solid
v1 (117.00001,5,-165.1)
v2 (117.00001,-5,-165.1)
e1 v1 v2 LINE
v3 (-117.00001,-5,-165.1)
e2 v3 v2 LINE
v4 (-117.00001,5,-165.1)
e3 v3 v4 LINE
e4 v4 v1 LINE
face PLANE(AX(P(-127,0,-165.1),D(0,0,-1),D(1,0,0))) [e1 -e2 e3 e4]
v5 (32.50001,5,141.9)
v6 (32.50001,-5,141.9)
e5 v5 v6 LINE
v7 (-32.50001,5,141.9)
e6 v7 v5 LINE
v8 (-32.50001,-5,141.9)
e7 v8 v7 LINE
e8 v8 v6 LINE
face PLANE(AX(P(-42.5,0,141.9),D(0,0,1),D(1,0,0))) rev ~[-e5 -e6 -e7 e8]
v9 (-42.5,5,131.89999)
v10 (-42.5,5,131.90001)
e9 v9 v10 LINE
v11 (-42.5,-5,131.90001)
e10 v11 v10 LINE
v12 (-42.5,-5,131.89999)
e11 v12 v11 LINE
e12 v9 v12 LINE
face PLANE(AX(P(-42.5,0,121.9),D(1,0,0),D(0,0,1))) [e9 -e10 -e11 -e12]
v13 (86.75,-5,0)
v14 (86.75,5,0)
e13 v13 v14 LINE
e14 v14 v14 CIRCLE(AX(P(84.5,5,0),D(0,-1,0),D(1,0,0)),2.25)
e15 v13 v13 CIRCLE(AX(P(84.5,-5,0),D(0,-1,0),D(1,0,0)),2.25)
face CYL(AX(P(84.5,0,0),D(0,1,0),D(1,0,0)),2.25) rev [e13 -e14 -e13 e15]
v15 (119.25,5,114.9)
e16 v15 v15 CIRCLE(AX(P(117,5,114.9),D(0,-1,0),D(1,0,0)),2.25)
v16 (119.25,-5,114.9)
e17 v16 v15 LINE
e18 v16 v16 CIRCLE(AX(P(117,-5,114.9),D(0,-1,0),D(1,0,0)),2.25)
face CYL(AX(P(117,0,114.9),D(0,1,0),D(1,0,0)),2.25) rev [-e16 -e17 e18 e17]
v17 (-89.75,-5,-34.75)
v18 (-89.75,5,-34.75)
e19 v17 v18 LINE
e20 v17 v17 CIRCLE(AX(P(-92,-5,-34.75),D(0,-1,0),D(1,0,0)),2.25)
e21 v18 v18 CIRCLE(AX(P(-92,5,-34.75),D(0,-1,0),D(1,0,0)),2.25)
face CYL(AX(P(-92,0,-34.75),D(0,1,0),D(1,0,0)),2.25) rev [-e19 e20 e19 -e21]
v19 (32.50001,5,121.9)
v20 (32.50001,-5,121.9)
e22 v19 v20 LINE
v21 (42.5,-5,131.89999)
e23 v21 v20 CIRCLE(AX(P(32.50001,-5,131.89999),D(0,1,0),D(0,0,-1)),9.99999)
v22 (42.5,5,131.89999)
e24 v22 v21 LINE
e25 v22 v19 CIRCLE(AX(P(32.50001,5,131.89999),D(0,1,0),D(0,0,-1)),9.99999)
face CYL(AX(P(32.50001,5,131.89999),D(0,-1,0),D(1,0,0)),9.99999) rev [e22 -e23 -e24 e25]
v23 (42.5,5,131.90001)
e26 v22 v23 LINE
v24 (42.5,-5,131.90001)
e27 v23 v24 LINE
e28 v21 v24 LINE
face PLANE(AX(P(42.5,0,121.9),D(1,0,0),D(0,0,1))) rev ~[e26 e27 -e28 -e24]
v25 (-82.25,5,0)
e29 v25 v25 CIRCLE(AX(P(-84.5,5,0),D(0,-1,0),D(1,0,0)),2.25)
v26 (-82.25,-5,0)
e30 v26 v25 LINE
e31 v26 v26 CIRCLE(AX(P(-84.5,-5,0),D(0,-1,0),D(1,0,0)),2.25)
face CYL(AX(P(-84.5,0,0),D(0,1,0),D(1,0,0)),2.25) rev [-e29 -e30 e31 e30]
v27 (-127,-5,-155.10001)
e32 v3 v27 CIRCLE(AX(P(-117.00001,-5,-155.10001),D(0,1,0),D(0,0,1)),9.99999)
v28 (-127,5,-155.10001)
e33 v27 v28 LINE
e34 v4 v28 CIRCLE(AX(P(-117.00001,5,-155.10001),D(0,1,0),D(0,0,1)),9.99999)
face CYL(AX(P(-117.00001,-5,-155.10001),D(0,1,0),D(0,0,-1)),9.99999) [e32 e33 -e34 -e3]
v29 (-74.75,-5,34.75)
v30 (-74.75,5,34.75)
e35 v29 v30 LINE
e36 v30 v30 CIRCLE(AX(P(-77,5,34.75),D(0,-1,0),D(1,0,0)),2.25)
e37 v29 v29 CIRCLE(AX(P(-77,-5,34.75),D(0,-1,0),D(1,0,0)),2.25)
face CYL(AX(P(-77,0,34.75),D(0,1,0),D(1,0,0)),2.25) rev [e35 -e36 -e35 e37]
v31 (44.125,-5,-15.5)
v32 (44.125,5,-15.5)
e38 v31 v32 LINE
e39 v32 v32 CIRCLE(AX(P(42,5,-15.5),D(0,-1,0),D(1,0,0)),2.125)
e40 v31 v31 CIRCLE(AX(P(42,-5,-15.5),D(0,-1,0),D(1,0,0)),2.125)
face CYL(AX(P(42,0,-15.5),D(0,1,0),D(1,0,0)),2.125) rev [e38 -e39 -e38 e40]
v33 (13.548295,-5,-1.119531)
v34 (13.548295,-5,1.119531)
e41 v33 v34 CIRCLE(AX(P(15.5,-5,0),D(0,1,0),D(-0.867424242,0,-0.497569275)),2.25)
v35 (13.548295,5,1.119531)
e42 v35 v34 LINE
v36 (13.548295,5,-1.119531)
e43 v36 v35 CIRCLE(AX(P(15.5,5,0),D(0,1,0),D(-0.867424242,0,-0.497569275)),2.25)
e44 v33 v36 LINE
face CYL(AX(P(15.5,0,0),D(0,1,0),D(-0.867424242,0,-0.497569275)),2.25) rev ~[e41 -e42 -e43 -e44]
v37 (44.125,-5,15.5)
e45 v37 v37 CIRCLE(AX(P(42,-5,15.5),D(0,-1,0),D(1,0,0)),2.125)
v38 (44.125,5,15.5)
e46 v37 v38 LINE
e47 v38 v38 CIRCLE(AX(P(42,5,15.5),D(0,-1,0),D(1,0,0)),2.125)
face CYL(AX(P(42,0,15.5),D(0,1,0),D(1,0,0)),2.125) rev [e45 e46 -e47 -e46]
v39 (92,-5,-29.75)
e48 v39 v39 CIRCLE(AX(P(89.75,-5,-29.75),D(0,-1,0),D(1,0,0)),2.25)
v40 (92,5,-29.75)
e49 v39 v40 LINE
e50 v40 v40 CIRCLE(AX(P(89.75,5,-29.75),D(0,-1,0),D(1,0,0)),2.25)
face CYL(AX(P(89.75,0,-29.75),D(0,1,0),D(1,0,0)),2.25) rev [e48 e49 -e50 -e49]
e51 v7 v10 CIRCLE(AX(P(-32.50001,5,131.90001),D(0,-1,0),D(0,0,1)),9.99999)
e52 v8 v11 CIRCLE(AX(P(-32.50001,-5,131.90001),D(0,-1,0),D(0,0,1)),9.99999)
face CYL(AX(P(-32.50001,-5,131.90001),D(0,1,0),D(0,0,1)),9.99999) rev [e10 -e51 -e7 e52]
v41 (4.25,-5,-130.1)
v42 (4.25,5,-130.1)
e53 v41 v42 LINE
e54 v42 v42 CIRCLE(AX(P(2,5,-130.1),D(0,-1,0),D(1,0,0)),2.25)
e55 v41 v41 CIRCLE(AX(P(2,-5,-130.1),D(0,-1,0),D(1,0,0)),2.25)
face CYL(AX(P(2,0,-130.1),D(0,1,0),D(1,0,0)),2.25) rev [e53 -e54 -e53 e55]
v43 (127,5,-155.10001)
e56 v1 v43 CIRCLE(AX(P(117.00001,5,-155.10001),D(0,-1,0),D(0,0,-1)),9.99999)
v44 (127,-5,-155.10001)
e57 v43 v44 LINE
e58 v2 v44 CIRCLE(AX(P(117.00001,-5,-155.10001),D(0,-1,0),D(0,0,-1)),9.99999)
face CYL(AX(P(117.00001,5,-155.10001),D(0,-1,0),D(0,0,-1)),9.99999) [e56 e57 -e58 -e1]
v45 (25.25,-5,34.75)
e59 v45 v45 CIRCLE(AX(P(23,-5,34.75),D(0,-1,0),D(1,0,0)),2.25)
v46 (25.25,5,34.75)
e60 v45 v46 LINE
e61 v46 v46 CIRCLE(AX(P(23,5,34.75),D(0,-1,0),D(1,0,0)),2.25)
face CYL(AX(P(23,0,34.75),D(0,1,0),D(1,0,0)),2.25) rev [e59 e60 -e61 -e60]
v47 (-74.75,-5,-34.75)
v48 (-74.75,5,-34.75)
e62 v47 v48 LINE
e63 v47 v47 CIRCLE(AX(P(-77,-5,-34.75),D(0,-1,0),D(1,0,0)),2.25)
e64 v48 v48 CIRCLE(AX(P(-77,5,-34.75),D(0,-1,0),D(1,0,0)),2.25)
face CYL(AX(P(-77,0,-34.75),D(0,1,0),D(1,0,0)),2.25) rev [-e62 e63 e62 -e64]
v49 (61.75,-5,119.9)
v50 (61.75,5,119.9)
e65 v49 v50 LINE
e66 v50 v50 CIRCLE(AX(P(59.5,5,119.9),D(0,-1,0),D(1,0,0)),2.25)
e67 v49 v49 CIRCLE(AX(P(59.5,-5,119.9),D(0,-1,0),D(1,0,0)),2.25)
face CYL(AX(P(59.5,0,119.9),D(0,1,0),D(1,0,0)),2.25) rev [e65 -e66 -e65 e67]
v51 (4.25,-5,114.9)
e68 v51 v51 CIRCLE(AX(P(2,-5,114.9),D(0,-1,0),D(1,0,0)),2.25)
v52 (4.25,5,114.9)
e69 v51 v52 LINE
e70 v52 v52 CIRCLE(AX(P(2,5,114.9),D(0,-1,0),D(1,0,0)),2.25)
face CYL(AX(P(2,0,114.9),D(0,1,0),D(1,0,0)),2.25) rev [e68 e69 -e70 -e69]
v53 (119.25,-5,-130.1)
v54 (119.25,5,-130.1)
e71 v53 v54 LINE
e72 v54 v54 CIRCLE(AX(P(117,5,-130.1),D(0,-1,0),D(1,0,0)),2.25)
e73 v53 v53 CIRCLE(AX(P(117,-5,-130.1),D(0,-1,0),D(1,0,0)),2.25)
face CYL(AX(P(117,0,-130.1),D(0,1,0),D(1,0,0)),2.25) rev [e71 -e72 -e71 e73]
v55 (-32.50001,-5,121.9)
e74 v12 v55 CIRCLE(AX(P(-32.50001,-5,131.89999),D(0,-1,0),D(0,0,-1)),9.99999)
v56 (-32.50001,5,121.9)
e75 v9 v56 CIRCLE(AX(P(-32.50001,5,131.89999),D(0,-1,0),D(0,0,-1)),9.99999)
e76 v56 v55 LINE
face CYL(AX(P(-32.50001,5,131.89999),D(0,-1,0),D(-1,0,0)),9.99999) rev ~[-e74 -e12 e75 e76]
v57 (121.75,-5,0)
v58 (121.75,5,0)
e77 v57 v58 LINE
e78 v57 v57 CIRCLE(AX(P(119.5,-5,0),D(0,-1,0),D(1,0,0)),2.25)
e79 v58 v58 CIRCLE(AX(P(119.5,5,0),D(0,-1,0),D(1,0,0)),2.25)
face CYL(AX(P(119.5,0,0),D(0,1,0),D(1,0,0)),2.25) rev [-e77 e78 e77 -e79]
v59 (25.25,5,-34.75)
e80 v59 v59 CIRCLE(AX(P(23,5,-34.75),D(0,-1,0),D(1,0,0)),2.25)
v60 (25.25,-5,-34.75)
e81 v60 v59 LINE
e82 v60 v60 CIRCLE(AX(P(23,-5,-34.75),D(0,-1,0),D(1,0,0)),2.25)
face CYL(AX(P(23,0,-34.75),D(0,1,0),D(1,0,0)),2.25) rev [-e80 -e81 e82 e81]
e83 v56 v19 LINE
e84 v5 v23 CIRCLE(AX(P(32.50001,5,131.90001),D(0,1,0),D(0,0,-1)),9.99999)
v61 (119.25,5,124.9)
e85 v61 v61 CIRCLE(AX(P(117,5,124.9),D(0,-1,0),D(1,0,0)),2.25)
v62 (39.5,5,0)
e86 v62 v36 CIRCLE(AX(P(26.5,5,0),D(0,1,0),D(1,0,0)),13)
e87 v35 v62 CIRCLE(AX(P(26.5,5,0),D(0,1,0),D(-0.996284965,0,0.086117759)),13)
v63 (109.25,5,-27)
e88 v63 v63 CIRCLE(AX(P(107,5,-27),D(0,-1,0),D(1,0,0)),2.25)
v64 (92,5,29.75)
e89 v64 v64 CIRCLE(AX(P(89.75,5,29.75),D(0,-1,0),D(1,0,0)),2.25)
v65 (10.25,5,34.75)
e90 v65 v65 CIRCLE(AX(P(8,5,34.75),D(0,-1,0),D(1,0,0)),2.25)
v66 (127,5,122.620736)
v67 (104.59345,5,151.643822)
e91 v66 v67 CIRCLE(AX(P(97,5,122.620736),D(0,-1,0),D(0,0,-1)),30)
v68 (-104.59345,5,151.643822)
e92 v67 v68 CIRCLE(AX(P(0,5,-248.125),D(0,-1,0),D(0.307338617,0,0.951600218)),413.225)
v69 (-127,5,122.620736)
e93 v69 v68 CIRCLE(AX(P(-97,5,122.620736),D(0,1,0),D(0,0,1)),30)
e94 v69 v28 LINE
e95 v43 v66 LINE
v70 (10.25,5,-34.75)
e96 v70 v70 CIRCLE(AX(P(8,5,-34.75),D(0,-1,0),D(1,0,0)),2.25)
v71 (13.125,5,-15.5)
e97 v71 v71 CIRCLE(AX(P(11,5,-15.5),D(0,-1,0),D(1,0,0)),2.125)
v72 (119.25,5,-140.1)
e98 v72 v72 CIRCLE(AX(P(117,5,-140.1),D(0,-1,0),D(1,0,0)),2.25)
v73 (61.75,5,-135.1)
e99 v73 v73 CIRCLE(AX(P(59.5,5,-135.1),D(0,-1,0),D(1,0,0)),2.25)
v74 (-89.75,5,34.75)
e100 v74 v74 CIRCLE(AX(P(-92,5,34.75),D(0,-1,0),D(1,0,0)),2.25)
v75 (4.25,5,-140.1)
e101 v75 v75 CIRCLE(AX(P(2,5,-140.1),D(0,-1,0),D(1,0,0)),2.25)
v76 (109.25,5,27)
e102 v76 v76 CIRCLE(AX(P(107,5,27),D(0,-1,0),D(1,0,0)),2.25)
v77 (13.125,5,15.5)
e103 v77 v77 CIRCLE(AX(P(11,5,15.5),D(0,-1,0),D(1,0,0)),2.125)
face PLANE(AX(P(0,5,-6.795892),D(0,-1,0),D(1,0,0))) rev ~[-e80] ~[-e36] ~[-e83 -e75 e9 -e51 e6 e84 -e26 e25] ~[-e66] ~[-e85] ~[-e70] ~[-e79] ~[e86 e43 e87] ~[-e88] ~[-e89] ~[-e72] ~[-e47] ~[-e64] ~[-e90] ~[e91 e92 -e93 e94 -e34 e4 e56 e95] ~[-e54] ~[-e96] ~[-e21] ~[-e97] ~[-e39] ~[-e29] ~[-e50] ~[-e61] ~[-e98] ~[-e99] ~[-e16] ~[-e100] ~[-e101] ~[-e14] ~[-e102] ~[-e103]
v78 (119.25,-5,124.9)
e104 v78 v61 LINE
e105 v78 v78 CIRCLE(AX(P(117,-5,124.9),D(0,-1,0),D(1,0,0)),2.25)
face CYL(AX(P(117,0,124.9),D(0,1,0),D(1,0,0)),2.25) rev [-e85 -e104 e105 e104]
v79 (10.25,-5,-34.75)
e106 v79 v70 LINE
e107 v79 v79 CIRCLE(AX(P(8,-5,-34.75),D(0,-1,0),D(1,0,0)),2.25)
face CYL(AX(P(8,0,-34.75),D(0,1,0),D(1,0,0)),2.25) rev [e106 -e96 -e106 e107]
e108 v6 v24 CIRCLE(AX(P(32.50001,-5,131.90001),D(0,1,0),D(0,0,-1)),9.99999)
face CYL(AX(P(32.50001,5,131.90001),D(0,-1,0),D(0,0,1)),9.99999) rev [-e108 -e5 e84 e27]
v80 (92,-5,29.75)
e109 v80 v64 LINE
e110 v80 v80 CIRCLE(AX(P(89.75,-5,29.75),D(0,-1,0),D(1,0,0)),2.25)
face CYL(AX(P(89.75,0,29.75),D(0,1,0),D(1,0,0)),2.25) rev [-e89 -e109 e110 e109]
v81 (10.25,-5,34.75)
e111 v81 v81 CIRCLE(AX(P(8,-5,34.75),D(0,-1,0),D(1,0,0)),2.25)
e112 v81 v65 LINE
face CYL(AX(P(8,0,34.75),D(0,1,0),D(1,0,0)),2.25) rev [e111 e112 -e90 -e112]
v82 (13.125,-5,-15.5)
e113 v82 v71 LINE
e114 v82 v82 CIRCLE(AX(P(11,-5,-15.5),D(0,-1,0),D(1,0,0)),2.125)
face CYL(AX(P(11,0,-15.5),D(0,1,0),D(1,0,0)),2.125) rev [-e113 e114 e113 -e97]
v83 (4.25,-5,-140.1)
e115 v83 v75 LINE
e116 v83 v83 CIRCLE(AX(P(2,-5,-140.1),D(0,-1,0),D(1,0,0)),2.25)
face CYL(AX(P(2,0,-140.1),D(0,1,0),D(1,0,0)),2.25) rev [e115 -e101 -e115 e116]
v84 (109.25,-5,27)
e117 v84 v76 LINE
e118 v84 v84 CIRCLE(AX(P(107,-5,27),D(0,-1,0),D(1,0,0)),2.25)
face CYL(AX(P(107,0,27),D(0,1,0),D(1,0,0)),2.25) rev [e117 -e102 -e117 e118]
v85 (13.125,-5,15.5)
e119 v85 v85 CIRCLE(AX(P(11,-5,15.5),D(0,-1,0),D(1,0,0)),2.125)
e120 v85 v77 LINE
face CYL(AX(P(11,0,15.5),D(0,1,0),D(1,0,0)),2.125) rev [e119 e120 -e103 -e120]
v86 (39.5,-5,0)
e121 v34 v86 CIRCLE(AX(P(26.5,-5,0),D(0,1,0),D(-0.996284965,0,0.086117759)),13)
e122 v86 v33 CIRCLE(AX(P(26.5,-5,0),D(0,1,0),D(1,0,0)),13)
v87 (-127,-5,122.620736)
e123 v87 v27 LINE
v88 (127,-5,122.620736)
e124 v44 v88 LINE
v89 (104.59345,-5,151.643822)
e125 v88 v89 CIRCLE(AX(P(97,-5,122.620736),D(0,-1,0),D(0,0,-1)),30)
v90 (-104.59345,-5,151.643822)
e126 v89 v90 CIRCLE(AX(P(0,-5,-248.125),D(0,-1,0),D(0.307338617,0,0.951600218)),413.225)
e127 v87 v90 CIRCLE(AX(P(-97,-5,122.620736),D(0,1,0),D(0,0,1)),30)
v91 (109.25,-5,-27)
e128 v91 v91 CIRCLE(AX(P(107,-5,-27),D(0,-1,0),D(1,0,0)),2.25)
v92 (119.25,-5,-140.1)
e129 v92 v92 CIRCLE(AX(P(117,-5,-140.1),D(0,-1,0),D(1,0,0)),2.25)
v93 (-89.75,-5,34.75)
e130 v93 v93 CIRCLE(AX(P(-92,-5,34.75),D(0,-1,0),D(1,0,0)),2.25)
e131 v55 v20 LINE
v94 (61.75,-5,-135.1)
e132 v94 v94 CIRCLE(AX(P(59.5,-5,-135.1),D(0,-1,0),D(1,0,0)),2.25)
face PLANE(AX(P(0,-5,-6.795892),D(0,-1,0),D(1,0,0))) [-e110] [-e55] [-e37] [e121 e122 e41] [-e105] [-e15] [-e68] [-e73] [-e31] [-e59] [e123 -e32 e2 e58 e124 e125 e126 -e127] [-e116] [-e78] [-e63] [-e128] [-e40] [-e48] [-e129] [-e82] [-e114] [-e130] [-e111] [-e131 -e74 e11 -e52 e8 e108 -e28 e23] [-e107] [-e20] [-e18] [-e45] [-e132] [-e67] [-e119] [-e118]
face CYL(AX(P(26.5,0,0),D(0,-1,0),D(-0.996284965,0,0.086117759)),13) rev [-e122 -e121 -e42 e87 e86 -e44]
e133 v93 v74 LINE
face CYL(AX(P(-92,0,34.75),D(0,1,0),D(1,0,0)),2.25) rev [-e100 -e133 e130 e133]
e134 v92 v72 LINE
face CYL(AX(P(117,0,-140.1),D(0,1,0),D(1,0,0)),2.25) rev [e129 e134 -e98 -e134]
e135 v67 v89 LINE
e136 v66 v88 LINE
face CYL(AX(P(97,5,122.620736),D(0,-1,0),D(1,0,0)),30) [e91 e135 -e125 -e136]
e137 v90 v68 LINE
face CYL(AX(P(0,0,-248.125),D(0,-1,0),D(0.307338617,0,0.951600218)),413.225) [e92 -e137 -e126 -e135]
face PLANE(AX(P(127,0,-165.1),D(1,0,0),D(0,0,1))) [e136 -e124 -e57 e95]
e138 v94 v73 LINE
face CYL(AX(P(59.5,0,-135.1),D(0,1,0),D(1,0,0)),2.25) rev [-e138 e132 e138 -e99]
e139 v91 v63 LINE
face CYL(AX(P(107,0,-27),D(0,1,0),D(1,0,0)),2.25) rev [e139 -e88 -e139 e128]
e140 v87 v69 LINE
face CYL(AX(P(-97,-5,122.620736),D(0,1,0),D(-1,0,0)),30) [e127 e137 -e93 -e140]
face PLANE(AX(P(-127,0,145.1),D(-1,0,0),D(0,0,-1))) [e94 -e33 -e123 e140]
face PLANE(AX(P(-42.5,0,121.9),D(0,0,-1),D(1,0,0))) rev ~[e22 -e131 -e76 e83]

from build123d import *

# Parameters (mm, degrees)
F0_R     = 2.25
F0_R_2   = 2.125
F0_W     = 85
F0_H     = 20
F1_DEPTH = 5
F2_R     = 9.99999
F3_R     = 30


# Not quite as in the source:
# - a fillet or chamfer is up to 0.001 mm smaller than in the source, because OpenCascade refuses the exact size


with BuildPart() as f1:
    # F0 (on Front) → F1 (new body, symmetric)
    with BuildSketch(Plane.XZ):
        with BuildLine():
            Line((-127, -165.1), (127, -165.1))
            Line((127, -165.1), (127, 145.1))
            ThreePointArc((127, 145.1), (0, 165.1), (-127, 145.1))
            Line((-127, 145.1), (-127, -165.1))
        make_face()
        with Locations((-92, -34.75)):
            Circle(F0_R, mode=Mode.SUBTRACT)
        with Locations((-77, -34.75)):
            Circle(F0_R, mode=Mode.SUBTRACT)
        with Locations((-84.5, 0)):
            Circle(F0_R, mode=Mode.SUBTRACT)
        with Locations((2, -140.1)):
            Circle(F0_R, mode=Mode.SUBTRACT)
        with Locations((2, -130.1)):
            Circle(F0_R, mode=Mode.SUBTRACT)
        with Locations((59.5, -135.1)):
            Circle(F0_R, mode=Mode.SUBTRACT)
        with Locations((117, -140.1)):
            Circle(F0_R, mode=Mode.SUBTRACT)
        with Locations((117, -130.1)):
            Circle(F0_R, mode=Mode.SUBTRACT)
        with Locations((8, -34.75)):
            Circle(F0_R, mode=Mode.SUBTRACT)
        with Locations((23, -34.75)):
            Circle(F0_R, mode=Mode.SUBTRACT)
        with Locations((11, -15.5)):
            Circle(F0_R_2, mode=Mode.SUBTRACT)
        with BuildLine():
            ThreePointArc((13.5482954545, -1.1195308693), (13.25, 0), (13.5482954545, 1.1195308693))
            ThreePointArc((13.5482954545, 1.1195308693), (27.0602860471, 12.9879205243), (39.5, 0))
            ThreePointArc((39.5, 0), (27.0602860471, -12.9879205243), (13.5482954545, -1.1195308693))
        make_face(mode=Mode.SUBTRACT)
        with Locations((42, -15.5)):
            Circle(F0_R_2, mode=Mode.SUBTRACT)
        with Locations((89.75, -29.75)):
            Circle(F0_R, mode=Mode.SUBTRACT)
        with Locations((84.5, 0)):
            Circle(F0_R, mode=Mode.SUBTRACT)
        with Locations((107, -27)):
            Circle(F0_R, mode=Mode.SUBTRACT)
        with Locations((119.5, 0)):
            Circle(F0_R, mode=Mode.SUBTRACT)
        with Locations((-92, 34.75)):
            Circle(F0_R, mode=Mode.SUBTRACT)
        with Locations((-77, 34.75)):
            Circle(F0_R, mode=Mode.SUBTRACT)
        with Locations((11, 15.5)):
            Circle(F0_R_2, mode=Mode.SUBTRACT)
        with Locations((8, 34.75)):
            Circle(F0_R, mode=Mode.SUBTRACT)
        with Locations((23, 34.75)):
            Circle(F0_R, mode=Mode.SUBTRACT)
        with Locations((42, 15.5)):
            Circle(F0_R_2, mode=Mode.SUBTRACT)
        with Locations((89.75, 29.75)):
            Circle(F0_R, mode=Mode.SUBTRACT)
        with Locations((107, 27)):
            Circle(F0_R, mode=Mode.SUBTRACT)
        with Locations((2, 114.9)):
            Circle(F0_R, mode=Mode.SUBTRACT)
        with Locations((59.5, 119.9)):
            Circle(F0_R, mode=Mode.SUBTRACT)
        with Locations((0, 131.9)):
            Rectangle(F0_W, F0_H, mode=Mode.SUBTRACT)
        with Locations((117, 114.9)):
            Circle(F0_R, mode=Mode.SUBTRACT)
        with Locations((117, 124.9)):
            Circle(F0_R, mode=Mode.SUBTRACT)
    extrude(amount=F1_DEPTH, both=True)

    # F2 (radius 10 in the source; OpenCascade refuses exactly that, so slightly less here)
    f2_edges = [f1.edges().sort_by_distance(p)[0] for p in [
        (-127, 0, -165.1),
        (127, 0, -165.1),
        (-42.5, 0, 141.9),
        (-42.5, 0, 121.9),
        (42.5, 0, 141.9),
        (42.5, 0, 121.9),
    ]]
    fillet(f2_edges, radius=F2_R)

    # F3
    f3_edges = [f1.edges().sort_by_distance(p)[0] for p in [
        (127, 0, 145.1),
        (-127, 0, 145.1),
    ]]
    fillet(f3_edges, radius=F3_R)


solid = f1.part
